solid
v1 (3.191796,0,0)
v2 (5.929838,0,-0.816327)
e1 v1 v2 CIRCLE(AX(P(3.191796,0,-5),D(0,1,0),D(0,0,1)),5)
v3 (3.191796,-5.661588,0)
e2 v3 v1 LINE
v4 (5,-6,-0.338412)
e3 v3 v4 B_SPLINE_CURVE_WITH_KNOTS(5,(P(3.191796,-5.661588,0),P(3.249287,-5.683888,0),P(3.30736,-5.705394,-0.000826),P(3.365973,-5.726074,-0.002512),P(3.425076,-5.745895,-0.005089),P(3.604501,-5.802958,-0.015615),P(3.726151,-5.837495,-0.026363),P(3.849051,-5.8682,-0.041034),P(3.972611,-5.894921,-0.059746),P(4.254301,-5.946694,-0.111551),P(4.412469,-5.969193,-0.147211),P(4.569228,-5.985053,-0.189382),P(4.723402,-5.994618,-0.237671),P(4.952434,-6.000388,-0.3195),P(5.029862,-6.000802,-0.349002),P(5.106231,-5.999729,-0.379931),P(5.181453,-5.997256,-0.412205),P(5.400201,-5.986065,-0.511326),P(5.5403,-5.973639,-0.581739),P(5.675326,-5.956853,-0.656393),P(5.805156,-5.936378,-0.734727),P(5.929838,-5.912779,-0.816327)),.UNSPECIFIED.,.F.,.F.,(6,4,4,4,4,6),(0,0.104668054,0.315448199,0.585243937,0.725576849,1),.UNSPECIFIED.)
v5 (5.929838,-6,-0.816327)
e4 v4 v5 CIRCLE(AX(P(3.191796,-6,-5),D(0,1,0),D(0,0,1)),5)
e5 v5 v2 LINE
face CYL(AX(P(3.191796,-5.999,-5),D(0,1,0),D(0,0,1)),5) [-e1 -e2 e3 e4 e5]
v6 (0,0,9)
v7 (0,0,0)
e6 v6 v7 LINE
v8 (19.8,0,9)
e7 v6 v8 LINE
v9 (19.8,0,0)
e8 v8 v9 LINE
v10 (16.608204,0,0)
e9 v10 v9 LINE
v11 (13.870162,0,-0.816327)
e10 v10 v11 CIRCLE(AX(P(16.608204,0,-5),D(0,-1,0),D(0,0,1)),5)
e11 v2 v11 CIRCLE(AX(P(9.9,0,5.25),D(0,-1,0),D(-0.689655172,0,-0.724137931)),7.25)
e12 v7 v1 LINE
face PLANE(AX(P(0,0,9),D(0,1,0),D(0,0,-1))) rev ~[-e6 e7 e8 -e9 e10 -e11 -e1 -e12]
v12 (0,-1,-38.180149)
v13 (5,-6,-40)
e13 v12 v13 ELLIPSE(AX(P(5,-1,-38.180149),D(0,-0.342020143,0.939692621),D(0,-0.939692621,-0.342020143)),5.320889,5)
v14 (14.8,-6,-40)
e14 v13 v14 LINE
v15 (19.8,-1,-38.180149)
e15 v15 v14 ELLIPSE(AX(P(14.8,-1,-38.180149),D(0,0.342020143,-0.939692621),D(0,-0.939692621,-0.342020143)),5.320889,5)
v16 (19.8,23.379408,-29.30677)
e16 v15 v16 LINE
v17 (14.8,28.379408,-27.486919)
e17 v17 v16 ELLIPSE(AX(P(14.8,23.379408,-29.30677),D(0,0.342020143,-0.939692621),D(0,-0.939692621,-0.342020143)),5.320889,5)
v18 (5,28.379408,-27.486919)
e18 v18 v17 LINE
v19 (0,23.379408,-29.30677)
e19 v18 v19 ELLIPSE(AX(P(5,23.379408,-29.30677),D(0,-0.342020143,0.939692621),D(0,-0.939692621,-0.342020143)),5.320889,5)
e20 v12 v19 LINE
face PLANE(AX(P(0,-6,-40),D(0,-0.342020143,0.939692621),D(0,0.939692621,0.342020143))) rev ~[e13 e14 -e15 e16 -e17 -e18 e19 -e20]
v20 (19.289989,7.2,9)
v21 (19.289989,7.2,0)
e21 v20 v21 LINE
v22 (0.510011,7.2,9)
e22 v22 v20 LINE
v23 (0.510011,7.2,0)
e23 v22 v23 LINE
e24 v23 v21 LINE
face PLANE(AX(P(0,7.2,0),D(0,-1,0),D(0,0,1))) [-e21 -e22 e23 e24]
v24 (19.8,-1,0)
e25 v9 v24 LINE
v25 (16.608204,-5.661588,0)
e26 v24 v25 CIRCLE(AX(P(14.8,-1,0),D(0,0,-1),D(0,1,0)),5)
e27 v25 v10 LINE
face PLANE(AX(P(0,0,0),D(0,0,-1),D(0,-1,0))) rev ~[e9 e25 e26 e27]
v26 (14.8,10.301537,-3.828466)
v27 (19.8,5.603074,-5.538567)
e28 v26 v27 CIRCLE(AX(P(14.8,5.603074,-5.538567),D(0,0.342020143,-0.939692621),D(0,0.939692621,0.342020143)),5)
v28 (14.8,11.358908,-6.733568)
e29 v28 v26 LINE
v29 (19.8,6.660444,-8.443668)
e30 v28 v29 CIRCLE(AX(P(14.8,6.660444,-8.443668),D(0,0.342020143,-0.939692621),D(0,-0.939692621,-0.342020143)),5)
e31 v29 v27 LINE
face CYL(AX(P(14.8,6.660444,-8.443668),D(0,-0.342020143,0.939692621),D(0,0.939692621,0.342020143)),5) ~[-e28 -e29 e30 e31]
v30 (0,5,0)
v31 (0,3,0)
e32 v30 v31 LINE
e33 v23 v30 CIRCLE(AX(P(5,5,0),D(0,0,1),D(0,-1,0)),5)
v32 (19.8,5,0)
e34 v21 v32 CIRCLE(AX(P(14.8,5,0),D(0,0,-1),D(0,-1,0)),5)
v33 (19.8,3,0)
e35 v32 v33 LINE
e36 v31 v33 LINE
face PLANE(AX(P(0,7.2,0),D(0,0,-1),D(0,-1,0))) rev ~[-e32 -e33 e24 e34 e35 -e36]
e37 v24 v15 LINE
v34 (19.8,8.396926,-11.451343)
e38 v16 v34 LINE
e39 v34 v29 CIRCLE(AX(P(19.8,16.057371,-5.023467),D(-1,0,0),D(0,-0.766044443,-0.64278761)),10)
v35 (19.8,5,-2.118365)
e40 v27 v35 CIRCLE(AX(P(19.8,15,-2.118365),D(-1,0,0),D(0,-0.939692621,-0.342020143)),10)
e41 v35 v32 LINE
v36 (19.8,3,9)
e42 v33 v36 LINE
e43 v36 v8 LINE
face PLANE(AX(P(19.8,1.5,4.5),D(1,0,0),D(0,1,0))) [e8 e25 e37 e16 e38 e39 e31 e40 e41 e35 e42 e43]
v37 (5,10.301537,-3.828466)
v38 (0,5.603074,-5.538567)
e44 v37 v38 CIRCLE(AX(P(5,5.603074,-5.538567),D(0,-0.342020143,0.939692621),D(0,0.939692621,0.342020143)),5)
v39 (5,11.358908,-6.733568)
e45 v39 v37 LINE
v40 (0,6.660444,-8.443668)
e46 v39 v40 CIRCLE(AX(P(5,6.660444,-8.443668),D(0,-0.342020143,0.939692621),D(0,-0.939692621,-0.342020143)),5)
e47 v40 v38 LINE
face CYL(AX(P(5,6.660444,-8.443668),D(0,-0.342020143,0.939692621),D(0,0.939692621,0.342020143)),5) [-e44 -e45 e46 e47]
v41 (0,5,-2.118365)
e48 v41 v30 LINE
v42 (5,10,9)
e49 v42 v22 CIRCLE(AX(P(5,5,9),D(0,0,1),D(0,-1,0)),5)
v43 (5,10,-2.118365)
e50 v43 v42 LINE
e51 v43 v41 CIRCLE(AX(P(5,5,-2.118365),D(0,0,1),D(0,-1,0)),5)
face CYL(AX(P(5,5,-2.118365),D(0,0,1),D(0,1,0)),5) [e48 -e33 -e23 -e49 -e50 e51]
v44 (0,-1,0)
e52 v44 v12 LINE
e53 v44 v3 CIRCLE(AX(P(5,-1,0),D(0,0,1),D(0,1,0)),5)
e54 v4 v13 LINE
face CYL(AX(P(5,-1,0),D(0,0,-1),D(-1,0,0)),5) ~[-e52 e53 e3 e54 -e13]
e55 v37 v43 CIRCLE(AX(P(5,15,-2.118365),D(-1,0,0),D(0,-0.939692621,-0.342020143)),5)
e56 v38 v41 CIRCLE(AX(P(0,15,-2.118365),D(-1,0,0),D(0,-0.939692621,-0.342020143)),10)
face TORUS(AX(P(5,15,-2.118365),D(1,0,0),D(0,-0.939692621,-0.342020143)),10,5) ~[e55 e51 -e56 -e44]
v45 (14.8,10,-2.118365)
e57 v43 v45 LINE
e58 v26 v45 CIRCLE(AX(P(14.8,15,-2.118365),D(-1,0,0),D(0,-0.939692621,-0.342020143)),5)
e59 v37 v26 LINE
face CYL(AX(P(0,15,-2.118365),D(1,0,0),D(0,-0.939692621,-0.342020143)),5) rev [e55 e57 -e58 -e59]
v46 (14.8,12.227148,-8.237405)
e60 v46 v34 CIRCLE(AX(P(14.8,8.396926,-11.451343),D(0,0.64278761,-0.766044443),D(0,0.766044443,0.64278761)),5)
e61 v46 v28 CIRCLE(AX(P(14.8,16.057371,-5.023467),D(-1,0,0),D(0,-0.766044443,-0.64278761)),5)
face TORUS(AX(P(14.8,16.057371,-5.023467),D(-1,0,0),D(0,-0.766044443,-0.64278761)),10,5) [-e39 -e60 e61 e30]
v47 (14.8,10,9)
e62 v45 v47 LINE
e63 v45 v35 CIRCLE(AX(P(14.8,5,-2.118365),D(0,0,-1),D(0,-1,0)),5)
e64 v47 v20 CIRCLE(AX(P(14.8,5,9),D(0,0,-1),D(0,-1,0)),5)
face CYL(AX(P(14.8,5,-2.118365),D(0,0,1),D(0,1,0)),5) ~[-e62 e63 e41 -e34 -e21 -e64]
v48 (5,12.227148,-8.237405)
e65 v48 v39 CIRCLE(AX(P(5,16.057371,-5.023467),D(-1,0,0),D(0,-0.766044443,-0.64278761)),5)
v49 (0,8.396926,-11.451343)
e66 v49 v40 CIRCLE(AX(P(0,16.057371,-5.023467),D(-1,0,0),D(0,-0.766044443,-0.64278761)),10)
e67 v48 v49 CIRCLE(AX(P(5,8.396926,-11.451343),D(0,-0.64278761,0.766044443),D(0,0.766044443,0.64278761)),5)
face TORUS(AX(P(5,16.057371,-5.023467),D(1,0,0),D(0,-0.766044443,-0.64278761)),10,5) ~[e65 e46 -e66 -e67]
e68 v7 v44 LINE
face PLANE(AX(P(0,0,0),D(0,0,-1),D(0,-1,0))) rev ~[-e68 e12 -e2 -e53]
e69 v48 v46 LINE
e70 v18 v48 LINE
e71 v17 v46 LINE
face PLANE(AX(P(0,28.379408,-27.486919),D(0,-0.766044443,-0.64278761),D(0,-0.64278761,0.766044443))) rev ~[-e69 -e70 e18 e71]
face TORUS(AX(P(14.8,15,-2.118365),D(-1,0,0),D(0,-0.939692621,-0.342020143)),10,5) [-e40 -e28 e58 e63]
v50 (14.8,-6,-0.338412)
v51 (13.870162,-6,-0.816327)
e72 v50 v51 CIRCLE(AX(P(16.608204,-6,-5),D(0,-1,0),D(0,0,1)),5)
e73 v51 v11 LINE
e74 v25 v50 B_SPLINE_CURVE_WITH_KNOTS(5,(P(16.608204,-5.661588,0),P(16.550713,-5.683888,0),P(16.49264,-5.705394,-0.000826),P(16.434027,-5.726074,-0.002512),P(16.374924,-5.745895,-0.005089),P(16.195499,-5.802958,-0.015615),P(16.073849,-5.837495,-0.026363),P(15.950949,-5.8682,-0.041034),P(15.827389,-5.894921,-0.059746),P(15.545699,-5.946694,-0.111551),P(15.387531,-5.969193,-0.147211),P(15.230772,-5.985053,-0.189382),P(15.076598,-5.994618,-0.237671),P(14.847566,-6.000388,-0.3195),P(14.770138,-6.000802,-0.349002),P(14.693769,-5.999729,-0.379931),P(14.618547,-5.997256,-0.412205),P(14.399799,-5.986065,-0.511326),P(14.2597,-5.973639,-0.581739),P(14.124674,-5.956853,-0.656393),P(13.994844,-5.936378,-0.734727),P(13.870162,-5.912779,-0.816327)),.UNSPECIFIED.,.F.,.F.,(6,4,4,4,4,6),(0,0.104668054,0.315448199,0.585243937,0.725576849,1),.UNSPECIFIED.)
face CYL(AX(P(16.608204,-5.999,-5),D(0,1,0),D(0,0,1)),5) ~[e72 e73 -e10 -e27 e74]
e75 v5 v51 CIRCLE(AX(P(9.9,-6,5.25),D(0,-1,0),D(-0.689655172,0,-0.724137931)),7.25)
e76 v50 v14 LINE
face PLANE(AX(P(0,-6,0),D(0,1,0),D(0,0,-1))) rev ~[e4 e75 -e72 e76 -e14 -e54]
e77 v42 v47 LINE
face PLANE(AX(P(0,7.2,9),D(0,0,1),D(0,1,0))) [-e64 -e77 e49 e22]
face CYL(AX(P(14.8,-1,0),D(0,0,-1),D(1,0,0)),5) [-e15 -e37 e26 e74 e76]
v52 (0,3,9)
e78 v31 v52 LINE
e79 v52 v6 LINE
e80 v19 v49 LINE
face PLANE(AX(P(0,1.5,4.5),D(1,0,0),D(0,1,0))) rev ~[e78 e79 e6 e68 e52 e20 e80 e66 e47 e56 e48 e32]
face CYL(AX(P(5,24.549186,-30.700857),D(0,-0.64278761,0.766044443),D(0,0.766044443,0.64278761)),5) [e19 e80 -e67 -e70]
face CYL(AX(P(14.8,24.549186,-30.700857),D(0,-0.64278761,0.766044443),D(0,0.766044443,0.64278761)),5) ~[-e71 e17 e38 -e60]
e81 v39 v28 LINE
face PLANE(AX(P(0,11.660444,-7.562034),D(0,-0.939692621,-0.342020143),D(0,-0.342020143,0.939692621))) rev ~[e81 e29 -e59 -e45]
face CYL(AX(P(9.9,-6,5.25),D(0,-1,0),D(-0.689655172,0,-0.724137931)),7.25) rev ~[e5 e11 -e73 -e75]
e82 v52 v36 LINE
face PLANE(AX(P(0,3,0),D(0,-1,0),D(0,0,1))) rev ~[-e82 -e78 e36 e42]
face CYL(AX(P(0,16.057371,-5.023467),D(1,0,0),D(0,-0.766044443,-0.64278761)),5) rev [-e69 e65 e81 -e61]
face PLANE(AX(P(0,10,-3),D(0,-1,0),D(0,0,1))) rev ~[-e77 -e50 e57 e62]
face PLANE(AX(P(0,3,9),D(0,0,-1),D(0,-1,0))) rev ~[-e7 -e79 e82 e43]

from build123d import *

# Parameters (mm, degrees)
F0_W     = 2.8
F0_H     = 9
F1_DEPTH = 19.8
F3_F1_R  = 5
F3_F2_R  = 5
F4_DEPTH = 6
F5_R     = 5


# Not quite as in the source:
# - a feature of the source that left no trace in its solid (it failed there, or was rolled back) is left out


with BuildPart() as f1:
    # F0 (on Right) → F1 (new body)
    with BuildSketch(Plane.YZ):
        Polygon((0, 9), (0, 0), (3, 0), (3, 2.7590821834), (3, 9), align=None)
        with Locations((8.6, 4.5)):
            Rectangle(F0_W, F0_H)
        Polygon((3, 0), (0, 0), (0, -3), (7.832443736, -3), (5.3151448425, 0), align=None)
        Polygon((7.2, 0), (5.3151448425, 0), (7.832443736, -3), (10, -3), (10, 0), align=None)
        Polygon((0, -3), (0, 0), (-6, 0), (-6, -40), (20.0199263242, -30.5295213202), (11.6604444312, -7.562033581), (7.832443736, -3), align=None)
        Polygon((10, -3), (7.832443736, -3), (11.6604444312, -7.562033581), align=None)
        Polygon((28.3794082171, -27.4869187373), (11.6604444312, -7.562033581), (20.0199263242, -30.5295213202), align=None)
    extrude(amount=F1_DEPTH)

    # F3: fillet of radius 5 on 6 edges, made by hand

    # F3_f1
    f3_f1_edges = [f1.edges().sort_by_distance(p)[0] for p in [
        (9.9, 10, -3),
        (9.9, 11.6604444312, -7.562033581),
    ]]
    fillet(f3_f1_edges, radius=F3_F1_R)

    # F3_f2
    f3_f2_edges = [f1.edges().sort_by_distance(p)[0] for p in [
        (0, -6, -20),
        (19.8, -6, -20),
        (19.8, 20.3032783203, -17.8621619185),
        (0, 20.3032783203, -17.8621619185),
        (0, 11.7272436201, -7.5234670512),
        (19.8, 11.7272436201, -7.5234670512),
    ]]
    fillet(f3_f2_edges, radius=F3_F2_R)

    # F2 (on face) → F4 (cut, through all)
    with BuildSketch(Plane.XZ.offset(6)):
        with BuildLine():
            ThreePointArc((4.9, 0), (9.9, -2), (14.9, 0))
            Line((14.9, 0), (4.9, 0))
        make_face()
    extrude(amount=-F4_DEPTH, mode=Mode.SUBTRACT)

    # F5
    f5_edges = [f1.edges().sort_by_distance(p)[0] for p in [
        (14.9, -2.9995, 0),
        (4.9, -2.9995, 0),
    ]]
    fillet(f5_edges, radius=F5_R)


solid = f1.part
